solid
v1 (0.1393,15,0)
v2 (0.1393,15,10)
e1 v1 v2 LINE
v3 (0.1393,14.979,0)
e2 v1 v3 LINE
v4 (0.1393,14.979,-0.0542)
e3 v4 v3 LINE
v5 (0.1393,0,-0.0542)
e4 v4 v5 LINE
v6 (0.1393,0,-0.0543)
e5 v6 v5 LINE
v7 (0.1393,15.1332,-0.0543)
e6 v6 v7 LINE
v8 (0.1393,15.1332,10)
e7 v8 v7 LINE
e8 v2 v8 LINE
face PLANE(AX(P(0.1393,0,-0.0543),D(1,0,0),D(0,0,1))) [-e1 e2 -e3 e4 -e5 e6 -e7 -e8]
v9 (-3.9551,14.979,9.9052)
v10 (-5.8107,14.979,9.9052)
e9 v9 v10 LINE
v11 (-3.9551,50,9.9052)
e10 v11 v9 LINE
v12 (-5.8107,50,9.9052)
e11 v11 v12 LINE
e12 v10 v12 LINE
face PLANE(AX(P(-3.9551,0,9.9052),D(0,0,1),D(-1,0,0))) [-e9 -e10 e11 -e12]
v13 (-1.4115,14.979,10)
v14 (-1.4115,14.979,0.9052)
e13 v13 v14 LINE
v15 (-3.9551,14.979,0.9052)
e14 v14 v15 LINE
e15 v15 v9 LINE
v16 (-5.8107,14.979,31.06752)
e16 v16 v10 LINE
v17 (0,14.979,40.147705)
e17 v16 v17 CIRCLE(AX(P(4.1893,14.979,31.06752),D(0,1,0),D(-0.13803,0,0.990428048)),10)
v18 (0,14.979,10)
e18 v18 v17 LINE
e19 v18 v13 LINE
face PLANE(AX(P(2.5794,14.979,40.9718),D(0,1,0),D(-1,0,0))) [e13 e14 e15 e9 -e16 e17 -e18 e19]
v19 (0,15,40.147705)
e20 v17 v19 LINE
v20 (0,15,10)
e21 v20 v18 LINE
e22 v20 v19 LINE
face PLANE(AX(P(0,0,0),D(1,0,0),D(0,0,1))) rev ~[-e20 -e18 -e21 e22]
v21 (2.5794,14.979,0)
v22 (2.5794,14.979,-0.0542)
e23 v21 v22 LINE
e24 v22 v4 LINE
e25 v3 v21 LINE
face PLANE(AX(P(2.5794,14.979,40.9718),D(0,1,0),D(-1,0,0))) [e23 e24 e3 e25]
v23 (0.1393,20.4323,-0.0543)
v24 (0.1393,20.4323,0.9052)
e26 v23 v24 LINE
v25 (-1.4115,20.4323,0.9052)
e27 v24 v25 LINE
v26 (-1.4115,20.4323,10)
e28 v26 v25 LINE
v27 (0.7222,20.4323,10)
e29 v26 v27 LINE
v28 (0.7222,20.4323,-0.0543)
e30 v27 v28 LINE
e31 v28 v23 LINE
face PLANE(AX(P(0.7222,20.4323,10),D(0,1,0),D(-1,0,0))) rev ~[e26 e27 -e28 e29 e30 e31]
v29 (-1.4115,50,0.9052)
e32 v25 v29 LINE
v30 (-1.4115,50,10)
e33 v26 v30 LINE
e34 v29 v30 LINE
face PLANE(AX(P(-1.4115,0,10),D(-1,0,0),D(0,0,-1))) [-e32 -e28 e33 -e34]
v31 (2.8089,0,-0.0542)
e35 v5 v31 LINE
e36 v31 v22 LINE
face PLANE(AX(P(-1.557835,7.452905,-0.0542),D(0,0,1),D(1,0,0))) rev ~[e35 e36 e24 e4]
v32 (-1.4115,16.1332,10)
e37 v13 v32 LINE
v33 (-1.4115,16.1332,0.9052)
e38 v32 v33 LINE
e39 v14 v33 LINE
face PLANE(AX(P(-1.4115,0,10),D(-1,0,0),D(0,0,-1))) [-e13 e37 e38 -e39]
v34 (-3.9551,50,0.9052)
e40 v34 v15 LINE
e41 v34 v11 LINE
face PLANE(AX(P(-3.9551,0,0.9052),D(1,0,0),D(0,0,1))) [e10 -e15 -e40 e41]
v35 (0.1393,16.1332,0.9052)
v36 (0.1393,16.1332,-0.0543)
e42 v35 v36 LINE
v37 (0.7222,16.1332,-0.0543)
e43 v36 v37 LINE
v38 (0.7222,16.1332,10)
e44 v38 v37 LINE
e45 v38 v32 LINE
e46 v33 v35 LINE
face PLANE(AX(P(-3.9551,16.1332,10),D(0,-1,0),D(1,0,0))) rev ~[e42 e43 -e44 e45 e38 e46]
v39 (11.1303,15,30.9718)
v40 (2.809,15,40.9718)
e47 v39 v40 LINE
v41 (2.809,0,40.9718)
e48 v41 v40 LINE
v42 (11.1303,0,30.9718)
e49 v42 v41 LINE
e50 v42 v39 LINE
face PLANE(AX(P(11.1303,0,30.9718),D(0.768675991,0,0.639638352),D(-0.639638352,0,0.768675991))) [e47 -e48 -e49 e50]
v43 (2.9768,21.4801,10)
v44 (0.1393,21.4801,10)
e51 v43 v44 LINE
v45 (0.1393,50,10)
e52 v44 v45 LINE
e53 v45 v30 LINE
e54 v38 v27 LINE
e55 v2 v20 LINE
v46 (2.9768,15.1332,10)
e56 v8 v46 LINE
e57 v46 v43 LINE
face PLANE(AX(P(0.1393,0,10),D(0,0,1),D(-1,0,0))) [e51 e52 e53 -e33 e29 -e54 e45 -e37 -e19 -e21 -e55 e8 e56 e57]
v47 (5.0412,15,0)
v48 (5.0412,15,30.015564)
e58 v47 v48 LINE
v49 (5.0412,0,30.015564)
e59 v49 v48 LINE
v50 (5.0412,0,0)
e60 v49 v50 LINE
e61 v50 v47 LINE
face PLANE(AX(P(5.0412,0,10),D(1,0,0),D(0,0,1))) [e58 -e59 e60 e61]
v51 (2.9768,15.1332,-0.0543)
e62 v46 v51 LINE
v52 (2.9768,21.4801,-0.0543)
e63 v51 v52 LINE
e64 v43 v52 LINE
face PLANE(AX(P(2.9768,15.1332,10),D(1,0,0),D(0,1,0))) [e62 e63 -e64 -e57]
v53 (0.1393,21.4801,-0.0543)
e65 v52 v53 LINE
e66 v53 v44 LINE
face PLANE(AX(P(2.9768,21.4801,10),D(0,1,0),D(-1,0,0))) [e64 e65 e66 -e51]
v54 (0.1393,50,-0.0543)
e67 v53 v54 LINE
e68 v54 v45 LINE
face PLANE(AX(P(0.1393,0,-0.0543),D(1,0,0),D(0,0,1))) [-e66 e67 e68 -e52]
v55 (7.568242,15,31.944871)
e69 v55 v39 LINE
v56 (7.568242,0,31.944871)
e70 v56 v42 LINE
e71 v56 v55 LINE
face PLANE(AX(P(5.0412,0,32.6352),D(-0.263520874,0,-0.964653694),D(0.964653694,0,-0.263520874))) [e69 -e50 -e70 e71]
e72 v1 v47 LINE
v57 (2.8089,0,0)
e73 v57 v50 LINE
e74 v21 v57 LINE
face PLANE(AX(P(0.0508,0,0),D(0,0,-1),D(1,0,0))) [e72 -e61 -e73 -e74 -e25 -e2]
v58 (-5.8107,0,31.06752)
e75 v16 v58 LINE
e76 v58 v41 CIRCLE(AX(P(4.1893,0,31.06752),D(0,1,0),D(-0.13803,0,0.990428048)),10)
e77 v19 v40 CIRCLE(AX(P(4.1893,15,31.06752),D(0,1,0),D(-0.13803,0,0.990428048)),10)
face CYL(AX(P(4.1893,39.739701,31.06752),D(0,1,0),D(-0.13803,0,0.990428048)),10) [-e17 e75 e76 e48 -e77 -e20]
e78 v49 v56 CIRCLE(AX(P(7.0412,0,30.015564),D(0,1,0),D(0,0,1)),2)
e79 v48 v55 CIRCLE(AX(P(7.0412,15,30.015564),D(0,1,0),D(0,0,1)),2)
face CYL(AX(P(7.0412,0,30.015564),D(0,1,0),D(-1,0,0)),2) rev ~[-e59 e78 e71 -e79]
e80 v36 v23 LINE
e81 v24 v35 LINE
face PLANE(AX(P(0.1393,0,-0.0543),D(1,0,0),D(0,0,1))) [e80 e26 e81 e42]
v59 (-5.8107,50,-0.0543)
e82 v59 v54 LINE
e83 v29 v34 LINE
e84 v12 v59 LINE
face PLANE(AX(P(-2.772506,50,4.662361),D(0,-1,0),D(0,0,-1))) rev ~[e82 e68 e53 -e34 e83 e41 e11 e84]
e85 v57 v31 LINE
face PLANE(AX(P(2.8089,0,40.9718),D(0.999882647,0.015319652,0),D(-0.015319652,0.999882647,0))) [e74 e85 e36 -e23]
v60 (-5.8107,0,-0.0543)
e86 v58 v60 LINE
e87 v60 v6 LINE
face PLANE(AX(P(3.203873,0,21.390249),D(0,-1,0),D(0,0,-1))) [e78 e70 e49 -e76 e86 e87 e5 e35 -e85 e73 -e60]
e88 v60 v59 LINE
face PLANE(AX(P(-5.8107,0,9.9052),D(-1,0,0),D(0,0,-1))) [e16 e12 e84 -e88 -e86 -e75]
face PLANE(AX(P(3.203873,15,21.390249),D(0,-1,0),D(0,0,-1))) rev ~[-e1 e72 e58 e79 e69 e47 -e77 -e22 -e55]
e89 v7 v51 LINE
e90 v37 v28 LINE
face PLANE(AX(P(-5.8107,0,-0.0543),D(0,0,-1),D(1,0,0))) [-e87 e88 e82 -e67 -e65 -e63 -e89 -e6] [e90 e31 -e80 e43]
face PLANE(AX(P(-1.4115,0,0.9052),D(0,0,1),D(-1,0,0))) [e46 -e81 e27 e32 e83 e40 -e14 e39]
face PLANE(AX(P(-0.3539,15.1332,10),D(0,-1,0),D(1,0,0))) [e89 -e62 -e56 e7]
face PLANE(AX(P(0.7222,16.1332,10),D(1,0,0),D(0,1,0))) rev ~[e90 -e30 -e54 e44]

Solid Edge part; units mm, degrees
sketch "Sketch1" plane through (0, 0, 0) normal (0, -1, 0) x (1, 0, 0)
  line L0 (5.0412, 10) -> (5.0412, 32.6352)
  line L1 (5.0412, 32.6352) -> (11.1303, 30.9718)
  line L2 (11.1303, 30.9718) -> (2.809, 40.9718)
  line L3 (0, 40.9718) -> (2.809, 40.9718)
  line L4 (0, 0) -> (0, 40.9718)
  line L5 (0, 0) -> (0.0508, 0)
  line L6 (0.0508, 0) -> (5.0412, 0)
  line L7 (5.0412, 0) -> (5.0412, 10)
extrude "Protrusion1" add sketch "Sketch1" against normal blind 15
sketch "Sketch2" plane through (0, 0, 0) normal (0, -1, 0) x (1, 0, 0)
  line L0 (-1.4115, 10) -> (-1.4115, 1)
  line L1 (0.1393, 10) -> (-1.4115, 10)
  line L2 (0.1393, -0.0543) -> (0.1393, 10)
  line L3 (-5.8107, -0.0543) -> (0.1393, -0.0543)
  line L4 (-5.8107, 9.9052) -> (-5.8107, -0.0543)
  line L5 (-3.9551, 9.9052) -> (-5.8107, 9.9052)
  line L6 (-3.9551, 0.9052) -> (-3.9551, 9.9052)
  line L7 (-1.4115, 0.9052) -> (-3.9551, 0.9052)
extrude "ProtrusioneEstrusa_8" add sketch "Sketch2" against normal blind 50 material side at (-1.4615, 0, 5.5)
sketch "Sketch3" plane through (3.7254, 22.5, 10) normal (0, 0, 1) x (0, 1, 0)
  line L0 (-2.0677, 7.6805) -> (-6.3668, 7.6805)
  line L1 (-6.3668, 7.6805) -> (-6.3668, 3.0032)
  line L2 (-6.3668, 3.0032) -> (-2.0677, 3.0032)
  line L3 (-2.0677, 3.0032) -> (-2.0677, 7.6805)
extrude "Cutout1" cut sketch "Sketch3" against normal blind 8.8165
sketch "Sketch4" plane through (3.7254, 22.5, 10) normal (0, 0, 1) x (0, 1, 0)
  line L0 (-2.0677, 3.0032) -> (-2.0677, 7.6805)
  line L1 (-2.0677, 7.6805) -> (-6.3668, 7.6805)
  line L2 (-6.3668, 7.6805) -> (-6.3668, 3.0032)
  line L3 (-6.3668, 3.0032) -> (-2.0677, 3.0032)
extrude "Cutout2" cut sketch "Sketch4" against normal up to vertex (9.0948 mm away)
sketch "Sketch5" plane through (3.7254, 22.5, 10) normal (0, 0, 1) x (0, 1, 0)
  line L0 (-1.0199, 4.0793) -> (-2.0677, 4.0793)
  line L1 (-2.0677, 3.0032) -> (-2.0677, 4.0793)
  line L2 (-6.3668, 3.0032) -> (-2.0677, 3.0032)
  line L3 (-6.3668, 4.0793) -> (-6.3668, 3.0032)
  line L4 (-6.3668, 4.0793) -> (-7.3668, 4.0793)
  line L5 (-7.3668, 4.0793) -> (-7.3668, 0.7486)
  line L6 (-7.3668, 0.7486) -> (-1.0199, 0.7486)
  line L7 (-1.0199, 0.7486) -> (-1.0199, 4.0793)
extrude "Protrusion2" add sketch "Sketch5" against normal up to vertex (10.0543 mm away)
sketch "Sketch6" plane through (1.2976, 7.5, 40.9718) normal (0, 0, 1) x (0, -1, 0)
  line L0 (7.5, 1.5113) -> (-7.479, 1.2818)
  line L1 (-7.479, 1.2818) -> (-7.479, -7.1083)
  line L2 (-7.479, -7.1083) -> (7.5, -7.1083)
  line L3 (7.5, -7.1083) -> (7.5, 1.5113)
extrude "Protrusion3" add sketch "Sketch6" against normal up to vertex (41.026 mm away)
fillet "Rotondo_2" radius 2 1 edges at (5.0412, 7.5, 32.6352)
fillet "Rotondo_3" radius 10 1 edges at (-5.8107, 7.4895, 40.9718)
